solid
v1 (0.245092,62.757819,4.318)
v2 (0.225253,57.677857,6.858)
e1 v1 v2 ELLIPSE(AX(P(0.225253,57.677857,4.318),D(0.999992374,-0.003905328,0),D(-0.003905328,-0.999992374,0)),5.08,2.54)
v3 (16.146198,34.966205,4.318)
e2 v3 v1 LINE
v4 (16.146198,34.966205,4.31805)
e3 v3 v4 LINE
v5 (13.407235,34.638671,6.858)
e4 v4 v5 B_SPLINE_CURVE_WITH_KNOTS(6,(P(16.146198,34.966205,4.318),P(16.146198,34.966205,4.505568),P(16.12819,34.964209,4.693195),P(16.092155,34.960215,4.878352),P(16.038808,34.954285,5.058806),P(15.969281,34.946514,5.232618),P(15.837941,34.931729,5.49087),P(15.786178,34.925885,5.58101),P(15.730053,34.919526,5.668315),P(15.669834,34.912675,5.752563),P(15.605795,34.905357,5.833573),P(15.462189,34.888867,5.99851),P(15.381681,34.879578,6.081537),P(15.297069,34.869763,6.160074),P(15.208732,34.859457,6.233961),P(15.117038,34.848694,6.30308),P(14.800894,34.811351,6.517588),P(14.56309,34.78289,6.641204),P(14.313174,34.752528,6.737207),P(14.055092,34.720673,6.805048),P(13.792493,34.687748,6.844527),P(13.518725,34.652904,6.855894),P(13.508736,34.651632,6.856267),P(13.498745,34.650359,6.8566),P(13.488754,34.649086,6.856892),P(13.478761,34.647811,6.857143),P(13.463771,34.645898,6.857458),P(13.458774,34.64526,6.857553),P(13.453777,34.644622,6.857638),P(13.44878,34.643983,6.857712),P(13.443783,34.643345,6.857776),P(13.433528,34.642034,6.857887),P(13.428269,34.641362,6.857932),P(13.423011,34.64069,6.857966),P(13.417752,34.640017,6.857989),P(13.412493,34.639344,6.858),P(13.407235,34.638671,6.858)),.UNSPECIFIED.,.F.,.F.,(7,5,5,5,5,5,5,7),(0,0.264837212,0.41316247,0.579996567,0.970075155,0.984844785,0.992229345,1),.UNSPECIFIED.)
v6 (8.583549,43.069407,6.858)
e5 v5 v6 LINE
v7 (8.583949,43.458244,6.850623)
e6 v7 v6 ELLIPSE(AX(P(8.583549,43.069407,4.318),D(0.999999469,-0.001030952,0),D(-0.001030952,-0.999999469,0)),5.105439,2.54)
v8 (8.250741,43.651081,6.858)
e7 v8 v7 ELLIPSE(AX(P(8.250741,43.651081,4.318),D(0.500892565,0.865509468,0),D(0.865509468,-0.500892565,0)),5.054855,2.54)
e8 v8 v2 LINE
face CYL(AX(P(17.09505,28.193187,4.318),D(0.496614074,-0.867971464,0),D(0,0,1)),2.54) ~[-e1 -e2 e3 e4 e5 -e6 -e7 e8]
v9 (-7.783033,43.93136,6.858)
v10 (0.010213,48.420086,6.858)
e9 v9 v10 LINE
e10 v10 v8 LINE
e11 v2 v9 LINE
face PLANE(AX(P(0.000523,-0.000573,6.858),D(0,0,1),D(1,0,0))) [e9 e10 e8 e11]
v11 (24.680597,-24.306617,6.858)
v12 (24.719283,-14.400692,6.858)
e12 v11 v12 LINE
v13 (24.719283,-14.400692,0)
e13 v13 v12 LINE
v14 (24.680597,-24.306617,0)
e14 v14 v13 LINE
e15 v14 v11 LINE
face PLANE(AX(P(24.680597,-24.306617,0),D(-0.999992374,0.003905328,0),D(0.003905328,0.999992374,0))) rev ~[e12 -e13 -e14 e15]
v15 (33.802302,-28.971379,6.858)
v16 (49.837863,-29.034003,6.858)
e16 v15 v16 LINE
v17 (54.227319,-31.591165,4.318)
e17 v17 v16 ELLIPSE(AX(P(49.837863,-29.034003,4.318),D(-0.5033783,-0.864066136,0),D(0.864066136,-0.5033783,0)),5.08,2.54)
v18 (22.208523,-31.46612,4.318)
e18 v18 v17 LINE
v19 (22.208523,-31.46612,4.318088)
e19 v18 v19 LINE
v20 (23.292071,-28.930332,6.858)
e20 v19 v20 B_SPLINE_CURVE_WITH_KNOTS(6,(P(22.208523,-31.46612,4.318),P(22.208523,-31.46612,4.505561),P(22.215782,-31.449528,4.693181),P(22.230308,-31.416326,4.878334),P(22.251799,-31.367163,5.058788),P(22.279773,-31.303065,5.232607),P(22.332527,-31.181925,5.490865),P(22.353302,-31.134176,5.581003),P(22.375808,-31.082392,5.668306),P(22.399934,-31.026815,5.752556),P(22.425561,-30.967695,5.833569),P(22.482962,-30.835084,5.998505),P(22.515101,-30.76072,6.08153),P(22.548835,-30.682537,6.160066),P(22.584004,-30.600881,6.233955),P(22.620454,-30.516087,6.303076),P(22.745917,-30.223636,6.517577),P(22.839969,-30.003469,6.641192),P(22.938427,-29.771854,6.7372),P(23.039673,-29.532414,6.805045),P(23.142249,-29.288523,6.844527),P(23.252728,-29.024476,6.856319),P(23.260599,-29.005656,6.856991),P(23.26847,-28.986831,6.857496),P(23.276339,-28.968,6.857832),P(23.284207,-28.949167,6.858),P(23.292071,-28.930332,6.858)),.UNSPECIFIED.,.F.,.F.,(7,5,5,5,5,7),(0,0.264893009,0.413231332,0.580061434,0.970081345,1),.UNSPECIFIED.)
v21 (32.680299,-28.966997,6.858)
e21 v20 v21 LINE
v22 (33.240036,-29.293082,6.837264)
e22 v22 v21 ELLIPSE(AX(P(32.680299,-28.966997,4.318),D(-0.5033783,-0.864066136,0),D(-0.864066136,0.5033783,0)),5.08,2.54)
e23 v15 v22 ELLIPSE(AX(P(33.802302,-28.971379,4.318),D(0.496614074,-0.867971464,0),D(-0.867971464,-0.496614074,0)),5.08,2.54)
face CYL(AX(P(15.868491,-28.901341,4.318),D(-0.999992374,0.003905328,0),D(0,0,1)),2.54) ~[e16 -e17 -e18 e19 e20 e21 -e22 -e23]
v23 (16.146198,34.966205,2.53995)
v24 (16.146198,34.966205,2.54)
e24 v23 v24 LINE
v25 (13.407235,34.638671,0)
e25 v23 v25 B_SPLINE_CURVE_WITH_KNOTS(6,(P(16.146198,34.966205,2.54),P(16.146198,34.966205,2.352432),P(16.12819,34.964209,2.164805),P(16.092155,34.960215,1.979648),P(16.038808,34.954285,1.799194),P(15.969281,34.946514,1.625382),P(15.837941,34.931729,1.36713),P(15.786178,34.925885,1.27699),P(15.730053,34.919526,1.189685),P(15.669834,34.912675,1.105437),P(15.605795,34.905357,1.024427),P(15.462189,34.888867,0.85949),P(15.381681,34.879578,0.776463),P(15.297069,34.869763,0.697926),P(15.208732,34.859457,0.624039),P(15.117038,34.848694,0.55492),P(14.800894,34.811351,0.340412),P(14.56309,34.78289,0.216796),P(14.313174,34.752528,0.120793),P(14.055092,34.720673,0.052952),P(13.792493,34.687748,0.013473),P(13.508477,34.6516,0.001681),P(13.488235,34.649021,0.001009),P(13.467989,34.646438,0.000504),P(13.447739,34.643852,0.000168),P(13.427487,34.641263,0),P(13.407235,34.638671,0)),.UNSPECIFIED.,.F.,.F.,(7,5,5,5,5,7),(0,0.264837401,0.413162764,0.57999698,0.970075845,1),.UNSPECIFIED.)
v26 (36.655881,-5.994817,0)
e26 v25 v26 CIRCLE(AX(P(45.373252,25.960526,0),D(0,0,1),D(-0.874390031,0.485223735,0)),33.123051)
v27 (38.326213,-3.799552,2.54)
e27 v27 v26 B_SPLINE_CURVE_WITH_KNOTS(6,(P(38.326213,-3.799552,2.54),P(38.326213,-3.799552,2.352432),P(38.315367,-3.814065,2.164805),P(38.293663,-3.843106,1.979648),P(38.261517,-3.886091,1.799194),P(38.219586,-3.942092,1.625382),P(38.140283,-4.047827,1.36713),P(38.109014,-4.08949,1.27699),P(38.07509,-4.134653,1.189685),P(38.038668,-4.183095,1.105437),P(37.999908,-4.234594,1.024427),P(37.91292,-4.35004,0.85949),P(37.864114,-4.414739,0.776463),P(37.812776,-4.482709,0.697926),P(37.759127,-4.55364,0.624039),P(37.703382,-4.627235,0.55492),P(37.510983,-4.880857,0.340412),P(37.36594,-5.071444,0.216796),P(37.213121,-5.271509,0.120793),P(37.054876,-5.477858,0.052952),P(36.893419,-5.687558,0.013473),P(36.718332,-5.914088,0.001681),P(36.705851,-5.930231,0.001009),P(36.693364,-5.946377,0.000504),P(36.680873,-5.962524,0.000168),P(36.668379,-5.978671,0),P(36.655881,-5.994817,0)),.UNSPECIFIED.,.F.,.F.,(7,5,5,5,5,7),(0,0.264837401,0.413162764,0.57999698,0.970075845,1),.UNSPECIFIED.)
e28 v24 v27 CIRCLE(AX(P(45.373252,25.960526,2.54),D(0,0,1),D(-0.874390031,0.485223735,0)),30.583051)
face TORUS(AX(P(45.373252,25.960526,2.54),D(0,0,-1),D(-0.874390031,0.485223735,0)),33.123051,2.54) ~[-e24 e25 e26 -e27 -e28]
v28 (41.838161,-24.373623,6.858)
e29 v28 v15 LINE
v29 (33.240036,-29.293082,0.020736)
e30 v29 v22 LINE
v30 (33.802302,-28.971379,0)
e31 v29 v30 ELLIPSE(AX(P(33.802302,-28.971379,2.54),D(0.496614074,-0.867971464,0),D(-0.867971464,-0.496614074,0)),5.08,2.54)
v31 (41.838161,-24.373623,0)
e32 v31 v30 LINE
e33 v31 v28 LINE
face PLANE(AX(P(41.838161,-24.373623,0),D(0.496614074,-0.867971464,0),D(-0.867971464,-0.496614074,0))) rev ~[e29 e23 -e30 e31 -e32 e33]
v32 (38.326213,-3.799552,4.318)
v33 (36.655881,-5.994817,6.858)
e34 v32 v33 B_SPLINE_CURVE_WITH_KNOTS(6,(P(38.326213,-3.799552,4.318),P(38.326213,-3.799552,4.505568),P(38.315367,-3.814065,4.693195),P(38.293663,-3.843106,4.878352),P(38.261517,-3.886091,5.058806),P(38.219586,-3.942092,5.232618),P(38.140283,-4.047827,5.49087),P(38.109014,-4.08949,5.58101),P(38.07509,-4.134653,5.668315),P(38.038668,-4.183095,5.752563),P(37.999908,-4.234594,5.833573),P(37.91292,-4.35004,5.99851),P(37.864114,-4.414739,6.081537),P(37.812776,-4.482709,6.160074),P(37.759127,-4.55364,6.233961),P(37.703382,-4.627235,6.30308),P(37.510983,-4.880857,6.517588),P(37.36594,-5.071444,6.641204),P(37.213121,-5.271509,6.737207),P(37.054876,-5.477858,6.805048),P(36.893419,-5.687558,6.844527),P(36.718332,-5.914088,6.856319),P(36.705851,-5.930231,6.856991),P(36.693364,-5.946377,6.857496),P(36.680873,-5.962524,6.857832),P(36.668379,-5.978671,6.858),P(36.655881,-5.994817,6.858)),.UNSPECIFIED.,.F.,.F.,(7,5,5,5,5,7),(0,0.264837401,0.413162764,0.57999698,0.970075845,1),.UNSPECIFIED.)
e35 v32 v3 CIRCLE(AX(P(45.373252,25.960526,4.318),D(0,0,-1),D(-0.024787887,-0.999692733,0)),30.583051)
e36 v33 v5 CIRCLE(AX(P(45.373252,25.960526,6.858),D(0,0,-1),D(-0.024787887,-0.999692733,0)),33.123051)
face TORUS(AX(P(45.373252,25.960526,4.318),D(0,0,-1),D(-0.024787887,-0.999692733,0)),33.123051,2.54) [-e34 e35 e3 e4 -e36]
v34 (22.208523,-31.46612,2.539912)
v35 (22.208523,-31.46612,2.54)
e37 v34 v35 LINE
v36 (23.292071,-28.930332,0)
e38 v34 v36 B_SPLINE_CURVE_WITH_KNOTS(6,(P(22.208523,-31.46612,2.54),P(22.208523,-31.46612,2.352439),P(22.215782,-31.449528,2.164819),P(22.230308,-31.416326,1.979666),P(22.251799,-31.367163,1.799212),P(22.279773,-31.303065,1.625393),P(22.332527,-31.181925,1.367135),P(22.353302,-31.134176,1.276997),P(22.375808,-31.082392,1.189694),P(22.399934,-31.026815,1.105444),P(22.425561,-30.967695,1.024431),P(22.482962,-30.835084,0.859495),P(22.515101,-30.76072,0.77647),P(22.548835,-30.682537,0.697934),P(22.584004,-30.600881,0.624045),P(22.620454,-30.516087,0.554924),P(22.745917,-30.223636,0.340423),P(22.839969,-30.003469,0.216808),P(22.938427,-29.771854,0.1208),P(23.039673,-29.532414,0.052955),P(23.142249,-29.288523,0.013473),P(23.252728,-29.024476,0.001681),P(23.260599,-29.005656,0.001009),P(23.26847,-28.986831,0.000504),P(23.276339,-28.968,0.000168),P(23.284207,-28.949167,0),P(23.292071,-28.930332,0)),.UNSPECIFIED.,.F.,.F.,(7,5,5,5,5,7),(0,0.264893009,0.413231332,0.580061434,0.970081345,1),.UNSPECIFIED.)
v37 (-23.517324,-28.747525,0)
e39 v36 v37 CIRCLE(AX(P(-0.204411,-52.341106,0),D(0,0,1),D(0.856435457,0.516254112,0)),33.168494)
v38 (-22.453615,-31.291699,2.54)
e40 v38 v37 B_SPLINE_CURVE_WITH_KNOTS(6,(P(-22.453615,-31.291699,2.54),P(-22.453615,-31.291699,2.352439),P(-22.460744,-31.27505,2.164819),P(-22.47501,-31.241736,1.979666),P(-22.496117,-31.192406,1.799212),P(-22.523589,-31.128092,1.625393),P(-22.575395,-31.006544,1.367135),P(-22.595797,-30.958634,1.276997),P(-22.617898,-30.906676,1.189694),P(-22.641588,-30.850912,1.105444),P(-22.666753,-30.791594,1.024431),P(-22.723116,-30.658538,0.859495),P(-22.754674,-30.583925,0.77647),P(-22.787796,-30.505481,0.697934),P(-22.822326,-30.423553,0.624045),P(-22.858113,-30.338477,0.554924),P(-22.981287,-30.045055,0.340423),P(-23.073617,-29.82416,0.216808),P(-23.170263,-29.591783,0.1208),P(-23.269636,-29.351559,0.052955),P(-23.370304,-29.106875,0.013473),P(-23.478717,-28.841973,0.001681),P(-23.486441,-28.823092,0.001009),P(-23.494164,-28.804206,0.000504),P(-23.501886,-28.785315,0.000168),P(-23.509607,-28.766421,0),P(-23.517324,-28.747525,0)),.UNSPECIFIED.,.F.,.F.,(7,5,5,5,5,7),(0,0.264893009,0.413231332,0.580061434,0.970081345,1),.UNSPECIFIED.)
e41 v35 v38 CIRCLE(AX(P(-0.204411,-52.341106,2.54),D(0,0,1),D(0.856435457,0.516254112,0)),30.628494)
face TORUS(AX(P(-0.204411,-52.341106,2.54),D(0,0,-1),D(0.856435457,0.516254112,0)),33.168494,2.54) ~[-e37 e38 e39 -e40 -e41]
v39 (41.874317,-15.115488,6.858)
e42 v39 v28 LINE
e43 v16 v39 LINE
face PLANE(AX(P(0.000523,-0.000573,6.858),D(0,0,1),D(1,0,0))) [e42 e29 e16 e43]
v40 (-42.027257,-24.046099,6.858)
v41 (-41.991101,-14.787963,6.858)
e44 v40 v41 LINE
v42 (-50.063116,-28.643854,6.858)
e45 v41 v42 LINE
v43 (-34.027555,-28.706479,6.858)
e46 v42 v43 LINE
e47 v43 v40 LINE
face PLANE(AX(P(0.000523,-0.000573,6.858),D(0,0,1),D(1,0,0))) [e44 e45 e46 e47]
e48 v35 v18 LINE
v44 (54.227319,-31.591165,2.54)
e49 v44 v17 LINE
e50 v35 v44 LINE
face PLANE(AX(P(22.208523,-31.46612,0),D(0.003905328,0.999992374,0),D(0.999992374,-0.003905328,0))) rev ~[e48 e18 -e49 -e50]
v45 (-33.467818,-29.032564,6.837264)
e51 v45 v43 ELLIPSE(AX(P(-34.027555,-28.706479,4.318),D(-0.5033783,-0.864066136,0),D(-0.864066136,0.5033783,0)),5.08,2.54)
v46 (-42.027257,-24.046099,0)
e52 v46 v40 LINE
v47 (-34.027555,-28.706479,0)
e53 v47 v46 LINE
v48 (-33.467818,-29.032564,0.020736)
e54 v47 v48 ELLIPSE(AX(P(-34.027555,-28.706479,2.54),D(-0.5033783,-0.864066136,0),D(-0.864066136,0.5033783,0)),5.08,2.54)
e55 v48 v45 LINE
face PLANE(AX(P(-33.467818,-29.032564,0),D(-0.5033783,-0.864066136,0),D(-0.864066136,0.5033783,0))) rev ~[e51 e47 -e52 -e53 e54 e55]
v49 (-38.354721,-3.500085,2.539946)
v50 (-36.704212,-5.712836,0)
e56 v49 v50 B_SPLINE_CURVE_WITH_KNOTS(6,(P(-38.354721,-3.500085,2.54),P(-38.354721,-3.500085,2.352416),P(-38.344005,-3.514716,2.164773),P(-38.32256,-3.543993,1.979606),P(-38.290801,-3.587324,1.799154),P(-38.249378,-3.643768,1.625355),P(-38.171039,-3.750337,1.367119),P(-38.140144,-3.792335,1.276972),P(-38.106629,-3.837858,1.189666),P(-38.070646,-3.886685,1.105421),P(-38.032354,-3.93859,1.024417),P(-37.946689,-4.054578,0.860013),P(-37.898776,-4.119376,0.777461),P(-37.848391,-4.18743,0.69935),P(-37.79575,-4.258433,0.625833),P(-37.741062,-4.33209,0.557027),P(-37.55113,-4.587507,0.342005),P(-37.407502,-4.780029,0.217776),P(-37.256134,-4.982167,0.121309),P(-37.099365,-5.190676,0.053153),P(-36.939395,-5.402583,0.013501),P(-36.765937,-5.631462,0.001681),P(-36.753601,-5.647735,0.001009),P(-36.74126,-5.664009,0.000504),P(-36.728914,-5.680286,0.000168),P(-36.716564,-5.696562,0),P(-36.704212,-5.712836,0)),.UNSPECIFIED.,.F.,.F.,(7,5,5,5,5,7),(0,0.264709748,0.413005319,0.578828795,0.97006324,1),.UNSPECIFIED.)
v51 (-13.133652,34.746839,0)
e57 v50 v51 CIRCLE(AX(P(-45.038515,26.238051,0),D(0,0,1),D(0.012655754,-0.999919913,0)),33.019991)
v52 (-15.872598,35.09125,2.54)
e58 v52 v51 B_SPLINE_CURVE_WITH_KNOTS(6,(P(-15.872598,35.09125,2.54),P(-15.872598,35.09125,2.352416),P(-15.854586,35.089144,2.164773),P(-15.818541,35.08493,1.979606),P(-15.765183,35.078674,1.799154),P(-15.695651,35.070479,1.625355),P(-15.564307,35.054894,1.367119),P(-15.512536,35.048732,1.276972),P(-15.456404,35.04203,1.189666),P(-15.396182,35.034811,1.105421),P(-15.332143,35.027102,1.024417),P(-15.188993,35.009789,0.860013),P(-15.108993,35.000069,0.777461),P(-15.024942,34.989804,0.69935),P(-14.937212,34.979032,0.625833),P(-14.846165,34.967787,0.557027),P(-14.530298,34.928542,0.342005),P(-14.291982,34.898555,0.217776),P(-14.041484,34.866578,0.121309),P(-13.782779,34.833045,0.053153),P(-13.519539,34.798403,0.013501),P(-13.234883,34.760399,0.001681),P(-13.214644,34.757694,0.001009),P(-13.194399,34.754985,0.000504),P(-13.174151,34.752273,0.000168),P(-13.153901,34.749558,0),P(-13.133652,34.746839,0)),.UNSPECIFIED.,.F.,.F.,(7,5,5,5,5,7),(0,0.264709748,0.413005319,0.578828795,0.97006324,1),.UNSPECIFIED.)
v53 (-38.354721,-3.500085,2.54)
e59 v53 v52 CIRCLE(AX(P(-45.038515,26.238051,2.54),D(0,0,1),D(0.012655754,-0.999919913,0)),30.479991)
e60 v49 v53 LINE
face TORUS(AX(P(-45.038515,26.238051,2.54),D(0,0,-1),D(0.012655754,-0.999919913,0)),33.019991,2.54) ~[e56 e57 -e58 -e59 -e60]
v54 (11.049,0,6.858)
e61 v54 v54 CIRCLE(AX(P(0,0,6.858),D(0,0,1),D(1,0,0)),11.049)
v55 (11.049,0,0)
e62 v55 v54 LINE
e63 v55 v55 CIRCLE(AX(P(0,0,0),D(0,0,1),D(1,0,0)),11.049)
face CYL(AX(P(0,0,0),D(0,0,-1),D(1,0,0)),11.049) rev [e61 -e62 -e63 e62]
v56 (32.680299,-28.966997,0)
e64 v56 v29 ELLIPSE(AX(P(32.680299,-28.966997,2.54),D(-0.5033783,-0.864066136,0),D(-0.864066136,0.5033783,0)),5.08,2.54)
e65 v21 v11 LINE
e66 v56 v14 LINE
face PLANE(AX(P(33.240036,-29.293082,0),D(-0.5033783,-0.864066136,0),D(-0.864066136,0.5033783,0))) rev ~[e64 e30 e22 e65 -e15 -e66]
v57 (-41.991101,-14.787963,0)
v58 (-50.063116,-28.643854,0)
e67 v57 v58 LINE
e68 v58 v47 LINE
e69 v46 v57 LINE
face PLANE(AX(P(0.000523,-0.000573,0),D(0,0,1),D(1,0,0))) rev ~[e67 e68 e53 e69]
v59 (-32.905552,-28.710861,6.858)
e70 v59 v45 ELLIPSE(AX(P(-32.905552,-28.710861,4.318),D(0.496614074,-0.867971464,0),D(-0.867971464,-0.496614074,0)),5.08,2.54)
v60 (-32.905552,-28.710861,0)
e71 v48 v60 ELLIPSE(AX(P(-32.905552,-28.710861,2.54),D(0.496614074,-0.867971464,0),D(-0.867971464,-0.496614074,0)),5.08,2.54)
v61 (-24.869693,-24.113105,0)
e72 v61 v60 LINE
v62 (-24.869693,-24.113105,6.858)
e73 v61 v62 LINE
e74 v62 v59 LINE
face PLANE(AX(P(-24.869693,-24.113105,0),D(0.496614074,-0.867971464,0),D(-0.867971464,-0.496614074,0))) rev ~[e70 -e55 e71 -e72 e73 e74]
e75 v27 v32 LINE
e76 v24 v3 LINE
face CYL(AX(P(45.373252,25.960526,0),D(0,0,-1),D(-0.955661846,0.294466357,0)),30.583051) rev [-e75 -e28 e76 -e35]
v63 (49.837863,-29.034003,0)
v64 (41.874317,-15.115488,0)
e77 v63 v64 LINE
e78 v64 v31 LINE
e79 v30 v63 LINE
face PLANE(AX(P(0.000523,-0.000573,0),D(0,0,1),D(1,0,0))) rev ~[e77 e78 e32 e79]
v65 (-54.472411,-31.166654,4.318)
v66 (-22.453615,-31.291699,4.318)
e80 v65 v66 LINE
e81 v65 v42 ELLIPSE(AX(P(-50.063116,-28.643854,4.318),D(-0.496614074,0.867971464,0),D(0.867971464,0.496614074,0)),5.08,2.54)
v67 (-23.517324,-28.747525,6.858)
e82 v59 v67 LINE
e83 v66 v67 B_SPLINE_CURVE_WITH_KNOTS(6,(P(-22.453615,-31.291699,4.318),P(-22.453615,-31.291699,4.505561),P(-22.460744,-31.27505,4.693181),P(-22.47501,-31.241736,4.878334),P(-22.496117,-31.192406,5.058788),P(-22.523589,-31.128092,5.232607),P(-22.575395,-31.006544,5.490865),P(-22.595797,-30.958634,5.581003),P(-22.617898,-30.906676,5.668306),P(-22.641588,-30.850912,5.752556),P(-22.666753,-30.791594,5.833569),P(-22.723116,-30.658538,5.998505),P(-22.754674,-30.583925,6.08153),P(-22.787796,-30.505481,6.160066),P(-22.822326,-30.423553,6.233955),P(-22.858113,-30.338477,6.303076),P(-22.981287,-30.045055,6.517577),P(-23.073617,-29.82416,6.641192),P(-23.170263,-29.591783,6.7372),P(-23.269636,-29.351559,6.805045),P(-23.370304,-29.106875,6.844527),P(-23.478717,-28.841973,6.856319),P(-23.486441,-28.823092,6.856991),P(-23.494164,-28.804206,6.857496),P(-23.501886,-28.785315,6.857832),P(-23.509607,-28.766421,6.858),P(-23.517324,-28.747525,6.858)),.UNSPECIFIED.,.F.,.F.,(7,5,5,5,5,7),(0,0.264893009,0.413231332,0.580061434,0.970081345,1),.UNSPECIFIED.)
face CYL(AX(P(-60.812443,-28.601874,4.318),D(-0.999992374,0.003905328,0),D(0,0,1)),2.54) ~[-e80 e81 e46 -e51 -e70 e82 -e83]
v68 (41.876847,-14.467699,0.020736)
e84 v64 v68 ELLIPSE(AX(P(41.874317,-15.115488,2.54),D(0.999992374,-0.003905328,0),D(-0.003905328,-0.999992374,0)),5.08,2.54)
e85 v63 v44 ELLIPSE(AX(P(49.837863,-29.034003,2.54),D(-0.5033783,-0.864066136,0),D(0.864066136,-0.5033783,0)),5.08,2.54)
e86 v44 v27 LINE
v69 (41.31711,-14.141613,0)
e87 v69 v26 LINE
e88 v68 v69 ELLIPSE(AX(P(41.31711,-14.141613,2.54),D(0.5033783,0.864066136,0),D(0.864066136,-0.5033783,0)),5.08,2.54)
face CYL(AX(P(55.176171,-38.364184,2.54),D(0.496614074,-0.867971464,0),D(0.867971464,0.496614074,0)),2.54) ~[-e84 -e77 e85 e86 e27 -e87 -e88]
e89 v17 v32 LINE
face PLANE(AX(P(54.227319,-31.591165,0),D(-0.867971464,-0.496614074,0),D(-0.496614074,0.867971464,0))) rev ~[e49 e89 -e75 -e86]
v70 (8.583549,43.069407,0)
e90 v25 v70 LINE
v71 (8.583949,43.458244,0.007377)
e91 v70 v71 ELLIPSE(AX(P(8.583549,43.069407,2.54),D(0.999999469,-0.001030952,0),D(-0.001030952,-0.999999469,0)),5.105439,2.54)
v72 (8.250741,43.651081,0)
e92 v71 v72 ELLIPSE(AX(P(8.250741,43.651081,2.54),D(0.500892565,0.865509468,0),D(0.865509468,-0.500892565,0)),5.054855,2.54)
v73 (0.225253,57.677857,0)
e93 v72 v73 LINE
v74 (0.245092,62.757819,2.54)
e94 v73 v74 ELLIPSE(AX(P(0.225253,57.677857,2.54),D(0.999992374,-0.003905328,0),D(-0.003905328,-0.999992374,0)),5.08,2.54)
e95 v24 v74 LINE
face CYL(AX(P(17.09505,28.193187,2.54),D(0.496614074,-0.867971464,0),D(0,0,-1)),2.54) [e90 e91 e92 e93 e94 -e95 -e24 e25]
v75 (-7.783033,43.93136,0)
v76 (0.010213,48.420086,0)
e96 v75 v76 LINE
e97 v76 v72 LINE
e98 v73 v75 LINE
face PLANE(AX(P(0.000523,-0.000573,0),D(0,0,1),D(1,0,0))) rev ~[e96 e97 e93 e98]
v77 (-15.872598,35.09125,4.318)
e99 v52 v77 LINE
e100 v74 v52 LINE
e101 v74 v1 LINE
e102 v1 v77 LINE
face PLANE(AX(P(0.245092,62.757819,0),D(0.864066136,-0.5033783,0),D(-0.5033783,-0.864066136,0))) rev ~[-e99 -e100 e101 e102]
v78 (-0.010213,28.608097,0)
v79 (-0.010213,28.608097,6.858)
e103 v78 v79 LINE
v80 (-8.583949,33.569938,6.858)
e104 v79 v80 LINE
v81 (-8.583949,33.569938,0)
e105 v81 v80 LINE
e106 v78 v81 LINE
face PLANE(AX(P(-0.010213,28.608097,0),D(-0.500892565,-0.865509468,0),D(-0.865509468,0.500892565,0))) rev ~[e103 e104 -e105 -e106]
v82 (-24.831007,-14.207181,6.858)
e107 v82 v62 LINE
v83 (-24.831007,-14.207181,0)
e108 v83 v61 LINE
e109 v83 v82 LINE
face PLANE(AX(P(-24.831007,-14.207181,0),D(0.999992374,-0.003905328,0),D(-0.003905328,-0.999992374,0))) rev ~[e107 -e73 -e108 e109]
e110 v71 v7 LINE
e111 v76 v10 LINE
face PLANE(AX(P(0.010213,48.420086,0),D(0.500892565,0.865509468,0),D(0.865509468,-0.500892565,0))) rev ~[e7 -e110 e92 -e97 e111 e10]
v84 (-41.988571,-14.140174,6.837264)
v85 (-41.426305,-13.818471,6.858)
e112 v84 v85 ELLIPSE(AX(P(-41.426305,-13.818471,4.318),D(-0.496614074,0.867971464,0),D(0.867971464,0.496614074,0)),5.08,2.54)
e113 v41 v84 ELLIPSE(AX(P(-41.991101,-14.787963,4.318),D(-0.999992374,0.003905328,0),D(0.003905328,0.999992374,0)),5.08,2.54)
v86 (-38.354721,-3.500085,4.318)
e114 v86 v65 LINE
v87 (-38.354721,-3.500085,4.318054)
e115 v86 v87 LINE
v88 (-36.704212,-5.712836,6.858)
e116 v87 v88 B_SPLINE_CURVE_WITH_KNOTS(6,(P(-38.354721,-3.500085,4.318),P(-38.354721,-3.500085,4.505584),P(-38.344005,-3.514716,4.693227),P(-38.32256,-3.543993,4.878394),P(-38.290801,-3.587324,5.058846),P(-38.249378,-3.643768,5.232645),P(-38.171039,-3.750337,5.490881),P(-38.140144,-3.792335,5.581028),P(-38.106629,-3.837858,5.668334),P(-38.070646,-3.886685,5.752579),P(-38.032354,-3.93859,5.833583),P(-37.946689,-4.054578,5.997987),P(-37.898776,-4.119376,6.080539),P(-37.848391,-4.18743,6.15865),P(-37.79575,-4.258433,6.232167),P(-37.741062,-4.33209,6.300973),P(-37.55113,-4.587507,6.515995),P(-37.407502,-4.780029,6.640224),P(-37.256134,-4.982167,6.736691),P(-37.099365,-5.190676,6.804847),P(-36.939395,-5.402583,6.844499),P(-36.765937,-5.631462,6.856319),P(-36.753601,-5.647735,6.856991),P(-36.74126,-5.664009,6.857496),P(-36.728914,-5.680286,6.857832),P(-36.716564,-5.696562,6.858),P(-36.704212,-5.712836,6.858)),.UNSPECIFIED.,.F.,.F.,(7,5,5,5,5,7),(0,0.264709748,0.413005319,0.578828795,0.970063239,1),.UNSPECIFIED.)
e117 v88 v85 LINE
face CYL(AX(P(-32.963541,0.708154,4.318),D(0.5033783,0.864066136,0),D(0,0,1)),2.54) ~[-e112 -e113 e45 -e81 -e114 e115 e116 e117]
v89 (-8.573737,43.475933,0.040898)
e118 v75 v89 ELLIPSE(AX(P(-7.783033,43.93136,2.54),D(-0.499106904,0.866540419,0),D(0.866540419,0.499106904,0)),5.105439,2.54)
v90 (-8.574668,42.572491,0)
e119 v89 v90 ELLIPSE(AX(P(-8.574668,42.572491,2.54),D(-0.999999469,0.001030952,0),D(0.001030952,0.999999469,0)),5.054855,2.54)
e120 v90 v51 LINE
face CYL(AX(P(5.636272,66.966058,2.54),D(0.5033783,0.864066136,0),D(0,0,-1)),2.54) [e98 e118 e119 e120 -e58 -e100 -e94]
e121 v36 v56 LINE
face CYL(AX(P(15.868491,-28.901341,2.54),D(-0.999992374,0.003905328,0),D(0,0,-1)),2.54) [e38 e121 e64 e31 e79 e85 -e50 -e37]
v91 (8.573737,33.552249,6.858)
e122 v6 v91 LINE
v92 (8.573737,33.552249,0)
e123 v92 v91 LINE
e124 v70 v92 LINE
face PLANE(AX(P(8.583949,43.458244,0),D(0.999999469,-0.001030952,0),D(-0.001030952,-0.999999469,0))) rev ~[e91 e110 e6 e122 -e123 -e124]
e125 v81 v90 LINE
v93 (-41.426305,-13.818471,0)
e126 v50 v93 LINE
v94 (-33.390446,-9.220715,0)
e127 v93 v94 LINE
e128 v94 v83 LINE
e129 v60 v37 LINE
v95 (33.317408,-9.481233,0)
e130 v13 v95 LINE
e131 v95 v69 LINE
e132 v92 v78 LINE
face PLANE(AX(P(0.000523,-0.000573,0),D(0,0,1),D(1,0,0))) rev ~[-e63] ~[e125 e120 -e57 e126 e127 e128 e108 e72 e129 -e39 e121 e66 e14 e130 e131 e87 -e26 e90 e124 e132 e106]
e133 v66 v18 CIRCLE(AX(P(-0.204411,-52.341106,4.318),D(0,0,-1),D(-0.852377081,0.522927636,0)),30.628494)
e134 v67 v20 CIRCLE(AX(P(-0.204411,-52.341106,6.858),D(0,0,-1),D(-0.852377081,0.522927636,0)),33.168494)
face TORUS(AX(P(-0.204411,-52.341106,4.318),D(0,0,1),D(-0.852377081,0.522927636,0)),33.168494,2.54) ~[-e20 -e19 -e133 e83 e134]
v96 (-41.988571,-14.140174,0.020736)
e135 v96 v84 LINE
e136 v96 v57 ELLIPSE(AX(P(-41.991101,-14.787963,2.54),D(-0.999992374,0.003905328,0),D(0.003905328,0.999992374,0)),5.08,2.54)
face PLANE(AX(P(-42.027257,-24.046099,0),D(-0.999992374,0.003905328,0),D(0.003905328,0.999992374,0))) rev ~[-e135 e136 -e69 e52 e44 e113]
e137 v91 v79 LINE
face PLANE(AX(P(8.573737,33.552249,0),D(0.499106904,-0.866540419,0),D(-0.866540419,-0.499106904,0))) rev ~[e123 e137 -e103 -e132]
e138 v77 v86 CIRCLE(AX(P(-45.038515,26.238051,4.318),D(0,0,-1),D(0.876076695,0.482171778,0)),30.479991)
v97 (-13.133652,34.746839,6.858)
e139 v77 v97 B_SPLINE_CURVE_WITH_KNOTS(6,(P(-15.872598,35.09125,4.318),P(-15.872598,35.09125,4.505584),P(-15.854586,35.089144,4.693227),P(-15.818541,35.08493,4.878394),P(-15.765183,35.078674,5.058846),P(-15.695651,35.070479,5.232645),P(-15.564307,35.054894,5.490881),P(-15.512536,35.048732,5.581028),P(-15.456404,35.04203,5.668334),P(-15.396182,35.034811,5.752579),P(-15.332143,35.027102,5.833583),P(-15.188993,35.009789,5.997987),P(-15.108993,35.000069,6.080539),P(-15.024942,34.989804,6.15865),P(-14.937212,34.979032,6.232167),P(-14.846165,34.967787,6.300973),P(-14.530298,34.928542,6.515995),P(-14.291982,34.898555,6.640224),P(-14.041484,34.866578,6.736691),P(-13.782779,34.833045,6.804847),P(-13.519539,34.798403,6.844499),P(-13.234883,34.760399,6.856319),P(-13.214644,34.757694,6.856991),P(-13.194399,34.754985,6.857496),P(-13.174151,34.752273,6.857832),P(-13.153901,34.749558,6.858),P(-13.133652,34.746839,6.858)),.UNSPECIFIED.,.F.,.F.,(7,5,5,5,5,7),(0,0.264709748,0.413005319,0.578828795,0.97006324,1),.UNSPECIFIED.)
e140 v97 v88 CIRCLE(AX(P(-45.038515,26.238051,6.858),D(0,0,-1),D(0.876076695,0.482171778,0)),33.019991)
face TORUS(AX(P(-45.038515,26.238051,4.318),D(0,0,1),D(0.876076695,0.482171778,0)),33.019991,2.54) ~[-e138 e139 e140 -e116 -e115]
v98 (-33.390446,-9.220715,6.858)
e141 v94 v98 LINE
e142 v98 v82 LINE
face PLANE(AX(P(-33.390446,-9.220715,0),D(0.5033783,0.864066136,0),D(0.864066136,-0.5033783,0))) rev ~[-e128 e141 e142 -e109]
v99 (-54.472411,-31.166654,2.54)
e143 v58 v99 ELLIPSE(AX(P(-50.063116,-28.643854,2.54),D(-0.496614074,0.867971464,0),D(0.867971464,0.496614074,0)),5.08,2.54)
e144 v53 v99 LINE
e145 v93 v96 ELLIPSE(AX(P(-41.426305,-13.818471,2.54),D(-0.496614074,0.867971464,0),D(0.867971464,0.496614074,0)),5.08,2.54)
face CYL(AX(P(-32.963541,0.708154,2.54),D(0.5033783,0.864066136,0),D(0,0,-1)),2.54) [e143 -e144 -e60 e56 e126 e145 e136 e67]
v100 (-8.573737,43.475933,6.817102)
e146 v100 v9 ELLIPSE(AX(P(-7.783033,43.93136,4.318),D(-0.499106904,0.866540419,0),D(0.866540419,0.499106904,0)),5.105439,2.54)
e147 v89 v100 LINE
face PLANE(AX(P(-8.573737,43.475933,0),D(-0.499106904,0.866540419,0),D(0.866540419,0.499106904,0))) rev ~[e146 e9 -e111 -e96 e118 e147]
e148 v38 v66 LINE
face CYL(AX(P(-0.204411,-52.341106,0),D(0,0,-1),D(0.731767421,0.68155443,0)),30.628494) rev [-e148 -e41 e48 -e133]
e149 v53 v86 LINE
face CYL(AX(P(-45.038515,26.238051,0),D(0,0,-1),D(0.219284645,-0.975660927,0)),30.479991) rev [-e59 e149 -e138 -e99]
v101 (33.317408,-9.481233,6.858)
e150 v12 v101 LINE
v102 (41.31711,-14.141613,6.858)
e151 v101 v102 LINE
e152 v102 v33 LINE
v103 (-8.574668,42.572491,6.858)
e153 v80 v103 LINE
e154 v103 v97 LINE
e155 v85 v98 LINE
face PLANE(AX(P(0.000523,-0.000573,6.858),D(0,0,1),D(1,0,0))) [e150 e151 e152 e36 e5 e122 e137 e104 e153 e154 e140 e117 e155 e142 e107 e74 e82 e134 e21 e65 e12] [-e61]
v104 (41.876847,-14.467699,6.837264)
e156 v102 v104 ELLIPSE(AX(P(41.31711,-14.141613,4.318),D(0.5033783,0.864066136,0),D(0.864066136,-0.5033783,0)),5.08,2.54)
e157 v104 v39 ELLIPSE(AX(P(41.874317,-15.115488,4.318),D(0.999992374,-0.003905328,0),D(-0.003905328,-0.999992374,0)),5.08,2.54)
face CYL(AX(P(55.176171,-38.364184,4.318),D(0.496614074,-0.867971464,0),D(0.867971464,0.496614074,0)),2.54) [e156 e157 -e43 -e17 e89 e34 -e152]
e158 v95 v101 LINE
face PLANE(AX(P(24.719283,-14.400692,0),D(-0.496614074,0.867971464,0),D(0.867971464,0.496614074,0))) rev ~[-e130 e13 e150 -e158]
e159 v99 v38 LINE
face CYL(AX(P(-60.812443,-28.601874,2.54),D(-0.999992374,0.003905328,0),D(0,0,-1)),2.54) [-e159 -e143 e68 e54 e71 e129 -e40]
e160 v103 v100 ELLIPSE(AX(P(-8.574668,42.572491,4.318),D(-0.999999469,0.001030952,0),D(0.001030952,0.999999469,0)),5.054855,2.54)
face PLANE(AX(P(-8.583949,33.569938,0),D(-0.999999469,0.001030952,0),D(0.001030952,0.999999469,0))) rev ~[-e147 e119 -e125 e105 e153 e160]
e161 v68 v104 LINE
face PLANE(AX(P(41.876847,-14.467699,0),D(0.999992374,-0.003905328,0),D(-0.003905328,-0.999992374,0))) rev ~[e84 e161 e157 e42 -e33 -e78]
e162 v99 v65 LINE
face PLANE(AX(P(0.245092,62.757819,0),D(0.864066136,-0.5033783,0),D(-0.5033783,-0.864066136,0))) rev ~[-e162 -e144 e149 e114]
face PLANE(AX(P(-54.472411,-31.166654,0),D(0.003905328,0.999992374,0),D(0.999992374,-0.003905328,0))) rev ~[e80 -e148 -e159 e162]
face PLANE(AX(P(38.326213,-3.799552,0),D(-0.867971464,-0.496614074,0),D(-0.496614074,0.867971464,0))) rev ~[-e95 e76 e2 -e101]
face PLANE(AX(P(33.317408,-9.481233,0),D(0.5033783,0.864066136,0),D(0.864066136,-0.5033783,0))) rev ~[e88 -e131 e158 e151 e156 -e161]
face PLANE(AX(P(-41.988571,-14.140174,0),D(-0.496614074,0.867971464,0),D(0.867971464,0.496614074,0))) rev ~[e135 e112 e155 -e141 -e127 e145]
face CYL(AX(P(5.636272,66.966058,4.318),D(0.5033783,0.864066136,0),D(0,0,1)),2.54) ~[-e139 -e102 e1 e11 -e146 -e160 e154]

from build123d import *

# Parameters (mm, degrees)
F0_R         = 11.049
F1_DEPTH     = 6.858
F2_DEPTH     = 46.99
F3_DEPTH     = 37.592
F4_DEPTH     = 42.418
F5_DEPTH     = 29.718
F6_DEPTH     = 25.4
F7_T1_DEPTH  = 44.7190403061
F7_T3_DEPTH  = 44.7190403061
F7_T5_DEPTH  = 44.7190403061
F7_T7_DEPTH  = 44.7190403061
F7_T9_DEPTH  = 44.7190403061
F7_T11_DEPTH = 44.7190403061
F7_T14_ANGLE = 117.6067451319
F7_T16_ANGLE = 117.3898443425
F7_T18_ANGLE = 118.1021999746
F7_T20_ANGLE = 118.1021999746
F7_T22_ANGLE = 117.3898443425
F7_T24_ANGLE = 117.6067451319


# Not quite as in the source:
# - a fillet or chamfer that OpenCascade refuses, or shapes differently, is made with other operations: its cross-section is extruded or revolved along the edge and cut away or added


with BuildPart() as f1:
    # F0 (on Top) → F1 (new body)
    with BuildSketch(Plane.XY):
        with BuildLine():
            Line((22.208523276, -31.466120161), (54.2273194105, -31.5911650137))
            Line((54.2273194105, -31.5911650137), (38.3262133623, -3.7995517362))
            ThreePointArc((38.3262133623, -3.7995517362), (18.8280371905, 10.7725526064), (16.14619778, 34.966205418))
            Line((16.14619778, 34.966205418), (0.2450917317, 62.7578186955))
            Line((0.2450917317, 62.7578186955), (-15.8725983546, 35.0912502707))
            ThreePointArc((-15.8725983546, 35.0912502707), (-18.7017871859, 10.8950848293), (-38.354721056, -3.500085257))
            Line((-38.354721056, -3.500085257), (-54.4724111423, -31.1666536818))
            Line((-54.4724111423, -31.1666536818), (-22.4536150077, -31.2916985345))
            ThreePointArc((-22.4536150077, -31.2916985345), (-0.0847964289, -21.7128455258), (22.208523276, -31.466120161))
        make_face()
        Polygon((-41.9885712831, -14.1401743102), (-33.3904459647, -9.2207152943), (-24.8310068248, -14.207180737), (-24.8696930034, -24.1131051956), (-33.4678183218, -29.0325642115), (-42.0272574616, -24.0460987688), align=None, mode=Mode.SUBTRACT)
        Polygon((24.6805966683, -24.3066168019), (24.7192828468, -14.4006923433), (33.3174081652, -9.4812333274), (41.8768473051, -14.4676987701), (41.8381611265, -24.3736232287), (33.2400358081, -29.2930822446), align=None, mode=Mode.SUBTRACT)
        Circle(F0_R, mode=Mode.SUBTRACT)
        Polygon((-8.5839493951, 33.5699382512), (-8.5737367865, 43.4759329869), (0.0102126086, 48.4200859762), (8.5839493951, 43.4582442299), (8.5737367865, 33.5522494943), (-0.0102126086, 28.6080965049), align=None, mode=Mode.SUBTRACT)
        with BuildLine():
            Line((-22.4536150077, -31.2916985345), (22.208523276, -31.466120161))
            ThreePointArc((22.208523276, -31.466120161), (-0.0847964289, -21.7128455258), (-22.4536150077, -31.2916985345))
        make_face()
        with BuildLine():
            ThreePointArc((16.14619778, 34.966205418), (18.8280371905, 10.7725526064), (38.3262133623, -3.7995517362))
            Line((38.3262133623, -3.7995517362), (16.14619778, 34.966205418))
        make_face()
        with BuildLine():
            Line((-15.8725983546, 35.0912502707), (-38.354721056, -3.500085257))
            ThreePointArc((-38.354721056, -3.500085257), (-18.7017871859, 10.8950848293), (-15.8725983546, 35.0912502707))
        make_face()
    extrude(amount=F1_DEPTH)

    # F0 (on Top) → F2 (cut)
    with BuildSketch(Plane.XY):
        with BuildLine():
            Line((-15.8725983546, 35.0912502707), (-38.354721056, -3.500085257))
            ThreePointArc((-38.354721056, -3.500085257), (-18.7017871859, 10.8950848293), (-15.8725983546, 35.0912502707))
        make_face()
    extrude(amount=F2_DEPTH, mode=Mode.SUBTRACT)

    # F0 (on Top) → F3 (cut)
    with BuildSketch(Plane.XY):
        with BuildLine():
            Line((-22.4536150077, -31.2916985345), (22.208523276, -31.466120161))
            ThreePointArc((22.208523276, -31.466120161), (-0.0847964289, -21.7128455258), (-22.4536150077, -31.2916985345))
        make_face()
    extrude(amount=F3_DEPTH, mode=Mode.SUBTRACT)

    # F0 (on Top) → F4 (cut)
    with BuildSketch(Plane.XY):
        with BuildLine():
            ThreePointArc((16.14619778, 34.966205418), (18.8280371905, 10.7725526064), (38.3262133623, -3.7995517362))
            Line((38.3262133623, -3.7995517362), (16.14619778, 34.966205418))
        make_face()
    extrude(amount=F4_DEPTH, mode=Mode.SUBTRACT)

    # F0 (on Top) → F5 (cut)
    with BuildSketch(Plane.XY):
        Circle(F0_R)
    extrude(amount=F5_DEPTH, mode=Mode.SUBTRACT)

    # F0 (on Top) → F6 (cut)
    with BuildSketch(Plane.XY):
        Circle(F0_R)
    extrude(amount=F6_DEPTH, mode=Mode.SUBTRACT)

    # F7: fillet of radius 2.54 on 18 edges, made by hand

    # F7_s2 → F7_t1 (cut)
    with BuildSketch(Plane(origin=(-7.936508422, 13.8712597833, 0), x_dir=(0, 0, 1), z_dir=(-0.4966140739, 0.8679714636, 0))):
        with BuildLine():
            ThreePointArc((0, 28.8391486396), (0.7439487758, 30.6351998638), (2.54, 31.3791486396))
            Line((2.54, 31.3791486396), (0, 31.3791486396))
            Line((0, 31.3791486396), (0, 28.8391486396))
        make_face()
        with BuildLine():
            ThreePointArc((6.858, 28.8391486396), (6.1140512242, 30.6351998638), (4.318, 31.3791486396))
            Line((4.318, 31.3791486396), (6.858, 31.3791486396))
            Line((6.858, 31.3791486396), (6.858, 28.8391486396))
        make_face()
    extrude(amount=F7_T1_DEPTH, mode=Mode.SUBTRACT)

    # F7_s4 → F7_t3 (cut)
    with BuildSketch(Plane(origin=(30.1446132086, -52.6861106484, 0), x_dir=(0, 0, 1), z_dir=(-0.4966140739, 0.8679714636, 0))):
        with BuildLine():
            ThreePointArc((2.54, 31.3791486396), (0.7439487758, 30.6351998638), (0, 28.8391486396))
            Line((0, 28.8391486396), (0, 31.3791486396))
            Line((0, 31.3791486396), (2.54, 31.3791486396))
        make_face()
        with BuildLine():
            ThreePointArc((4.318, 31.3791486396), (6.1140512242, 30.6351998638), (6.858, 28.8391486396))
            Line((6.858, 28.8391486396), (6.858, 31.3791486396))
            Line((6.858, 31.3791486396), (4.318, 31.3791486396))
        make_face()
    extrude(amount=F7_T3_DEPTH, mode=Mode.SUBTRACT)

    # F7_s6 → F7_t5 (cut)
    with BuildSketch(Plane(origin=(15.9811175658, -0.0624119809, 0), x_dir=(0, 0, 1), z_dir=(0.9999923742, -0.0039053279, 0))):
        with BuildLine():
            ThreePointArc((0, 28.8391486396), (0.7439487758, 30.6351998638), (2.54, 31.3791486396))
            Line((2.54, 31.3791486396), (0, 31.3791486396))
            Line((0, 31.3791486396), (0, 28.8391486396))
        make_face()
        with BuildLine():
            ThreePointArc((6.858, 28.8391486396), (6.1140512242, 30.6351998638), (4.318, 31.3791486396))
            Line((4.318, 31.3791486396), (6.858, 31.3791486396))
            Line((6.858, 31.3791486396), (6.858, 28.8391486396))
        make_face()
    extrude(amount=F7_T5_DEPTH, mode=Mode.SUBTRACT)

    # F7_s8 → F7_t7 (cut)
    with BuildSketch(Plane(origin=(-8.0446091438, -13.8088478024, 0), x_dir=(0, 0, 1), z_dir=(-0.5033783003, -0.8640661357, 0))):
        with BuildLine():
            ThreePointArc((0, 28.8391486396), (0.7439487758, 30.6351998638), (2.54, 31.3791486396))
            Line((2.54, 31.3791486396), (0, 31.3791486396))
            Line((0, 31.3791486396), (0, 28.8391486396))
        make_face()
        with BuildLine():
            ThreePointArc((6.858, 28.8391486396), (6.1140512242, 30.6351998638), (4.318, 31.3791486396))
            Line((4.318, 31.3791486396), (6.858, 31.3791486396))
            Line((6.858, 31.3791486396), (6.858, 28.8391486396))
        make_face()
    extrude(amount=F7_T7_DEPTH, mode=Mode.SUBTRACT)

    # F7_s10 → F7_t9 (cut)
    with BuildSketch(Plane(origin=(-60.6998168524, 0.2370544983, 0), x_dir=(0, 0, 1), z_dir=(0.9999923742, -0.0039053279, 0))):
        with BuildLine():
            ThreePointArc((0, 28.8391486396), (0.7439487758, 30.6351998638), (2.54, 31.3791486396))
            Line((2.54, 31.3791486396), (0, 31.3791486396))
            Line((0, 31.3791486396), (0, 28.8391486396))
        make_face()
        with BuildLine():
            ThreePointArc((6.858, 28.8391486396), (6.1140512242, 30.6351998638), (4.318, 31.3791486396))
            Line((4.318, 31.3791486396), (6.858, 31.3791486396))
            Line((6.858, 31.3791486396), (6.858, 28.8391486396))
        make_face()
    extrude(amount=F7_T9_DEPTH, mode=Mode.SUBTRACT)

    # F7_s12 → F7_t11 (cut)
    with BuildSketch(Plane(origin=(30.5552036438, 52.4490561501, 0), x_dir=(0, 0, 1), z_dir=(-0.5033783003, -0.8640661357, 0))):
        with BuildLine():
            ThreePointArc((0, 28.8391486396), (0.7439487758, 30.6351998638), (2.54, 31.3791486396))
            Line((2.54, 31.3791486396), (0, 31.3791486396))
            Line((0, 31.3791486396), (0, 28.8391486396))
        make_face()
        with BuildLine():
            ThreePointArc((6.858, 28.8391486396), (6.1140512242, 30.6351998638), (4.318, 31.3791486396))
            Line((4.318, 31.3791486396), (6.858, 31.3791486396))
            Line((6.858, 31.3791486396), (6.858, 28.8391486396))
        make_face()
    extrude(amount=F7_T11_DEPTH, mode=Mode.SUBTRACT)

    # F7_s13 → F7_t14 (revolve, cut)
    with BuildSketch(Plane(origin=(21.6971694487, 39.0990533159, 0), x_dir=(0, 0, 1), z_dir=(0.4852237348, 0.8743900315, 0))):
        with BuildLine():
            ThreePointArc((0, -6.0457943644), (0.7439487758, -4.2497431402), (2.54, -3.5057943644))
            Line((2.54, -3.5057943644), (0, -3.5057943644))
            Line((0, -3.5057943644), (0, -6.0457943644))
        make_face()
    revolve(axis=Axis((45.3732523459, 25.9605259365, 0), (0, 0, 1)), revolution_arc=F7_T14_ANGLE, mode=Mode.SUBTRACT)

    # F7_s15 → F7_t16 (revolve, cut)
    with BuildSketch(Plane(origin=(23.0875297384, -38.3008650951, 0), x_dir=(0, 0, 1), z_dir=(0.5162541117, -0.8564354571, 0))):
        with BuildLine():
            ThreePointArc((0, -5.9721181992), (0.7439487758, -4.176066975), (2.54, -3.4321181992))
            Line((2.54, -3.4321181992), (0, -3.4321181992))
            Line((0, -3.4321181992), (0, -5.9721181992))
        make_face()
    revolve(axis=Axis((-0.2044107419, -52.3411058879, 0), (0, 0, 1)), revolution_arc=F7_T16_ANGLE, mode=Mode.SUBTRACT)

    # F7_s17 → F7_t18 (revolve, cut)
    with BuildSketch(Plane(origin=(-44.6992655412, -0.5657482073, 0), x_dir=(0, 0, 1), z_dir=(-0.9999199127, -0.0126557538, 0))):
        with BuildLine():
            ThreePointArc((0, -6.2140449518), (0.7439487758, -4.4179937276), (2.54, -3.6740449518))
            Line((2.54, -3.6740449518), (0, -3.6740449518))
            Line((0, -3.6740449518), (0, -6.2140449518))
        make_face()
    revolve(axis=Axis((-45.0385149903, 26.2380507555, 0), (0, 0, 1)), revolution_arc=F7_T18_ANGLE, mode=Mode.SUBTRACT)

    # F7_s19 → F7_t20 (revolve, cut)
    with BuildSketch(Plane(origin=(-21.5544505992, 39.1631213047, 0), x_dir=(0, 0, 1), z_dir=(-0.4821717785, 0.8760766953, 0))):
        with BuildLine():
            ThreePointArc((6.858, 6.2140449518), (6.1140512242, 4.4179937276), (4.318, 3.6740449518))
            Line((4.318, 3.6740449518), (6.858, 3.6740449518))
            Line((6.858, 3.6740449518), (6.858, 6.2140449518))
        make_face()
    revolve(axis=Axis((-45.0385149903, 26.2380507555, 6.858), (0, 0, -1)), revolution_arc=F7_T20_ANGLE, mode=Mode.SUBTRACT)

    # F7_s21 → F7_t22 (revolve, cut)
    with BuildSketch(Plane(origin=(-23.3859780913, -38.1193694225, 0), x_dir=(0, 0, 1), z_dir=(-0.5229276359, -0.8523770807, 0))):
        with BuildLine():
            ThreePointArc((6.858, 5.9721181992), (6.1140512242, 4.176066975), (4.318, 3.4321181992))
            Line((4.318, 3.4321181992), (6.858, 3.4321181992))
            Line((6.858, 3.4321181992), (6.858, 5.9721181992))
        make_face()
    revolve(axis=Axis((-0.2044107419, -52.3411058879, 6.858), (0, 0, -1)), revolution_arc=F7_T22_ANGLE, mode=Mode.SUBTRACT)

    # F7_s23 → F7_t24 (revolve, cut)
    with BuildSketch(Plane(origin=(44.7020643692, -1.1084103144, 0), x_dir=(0, 0, 1), z_dir=(0.9996927331, -0.0247878874, 0))):
        with BuildLine():
            ThreePointArc((4.318, 3.5057943644), (6.1140512242, 4.2497431402), (6.858, 6.0457943644))
            Line((6.858, 6.0457943644), (6.858, 3.5057943644))
            Line((6.858, 3.5057943644), (4.318, 3.5057943644))
        make_face()
    revolve(axis=Axis((45.3732523459, 25.9605259365, 6.858), (0, 0, -1)), revolution_arc=F7_T24_ANGLE, mode=Mode.SUBTRACT)


solid = f1.part
